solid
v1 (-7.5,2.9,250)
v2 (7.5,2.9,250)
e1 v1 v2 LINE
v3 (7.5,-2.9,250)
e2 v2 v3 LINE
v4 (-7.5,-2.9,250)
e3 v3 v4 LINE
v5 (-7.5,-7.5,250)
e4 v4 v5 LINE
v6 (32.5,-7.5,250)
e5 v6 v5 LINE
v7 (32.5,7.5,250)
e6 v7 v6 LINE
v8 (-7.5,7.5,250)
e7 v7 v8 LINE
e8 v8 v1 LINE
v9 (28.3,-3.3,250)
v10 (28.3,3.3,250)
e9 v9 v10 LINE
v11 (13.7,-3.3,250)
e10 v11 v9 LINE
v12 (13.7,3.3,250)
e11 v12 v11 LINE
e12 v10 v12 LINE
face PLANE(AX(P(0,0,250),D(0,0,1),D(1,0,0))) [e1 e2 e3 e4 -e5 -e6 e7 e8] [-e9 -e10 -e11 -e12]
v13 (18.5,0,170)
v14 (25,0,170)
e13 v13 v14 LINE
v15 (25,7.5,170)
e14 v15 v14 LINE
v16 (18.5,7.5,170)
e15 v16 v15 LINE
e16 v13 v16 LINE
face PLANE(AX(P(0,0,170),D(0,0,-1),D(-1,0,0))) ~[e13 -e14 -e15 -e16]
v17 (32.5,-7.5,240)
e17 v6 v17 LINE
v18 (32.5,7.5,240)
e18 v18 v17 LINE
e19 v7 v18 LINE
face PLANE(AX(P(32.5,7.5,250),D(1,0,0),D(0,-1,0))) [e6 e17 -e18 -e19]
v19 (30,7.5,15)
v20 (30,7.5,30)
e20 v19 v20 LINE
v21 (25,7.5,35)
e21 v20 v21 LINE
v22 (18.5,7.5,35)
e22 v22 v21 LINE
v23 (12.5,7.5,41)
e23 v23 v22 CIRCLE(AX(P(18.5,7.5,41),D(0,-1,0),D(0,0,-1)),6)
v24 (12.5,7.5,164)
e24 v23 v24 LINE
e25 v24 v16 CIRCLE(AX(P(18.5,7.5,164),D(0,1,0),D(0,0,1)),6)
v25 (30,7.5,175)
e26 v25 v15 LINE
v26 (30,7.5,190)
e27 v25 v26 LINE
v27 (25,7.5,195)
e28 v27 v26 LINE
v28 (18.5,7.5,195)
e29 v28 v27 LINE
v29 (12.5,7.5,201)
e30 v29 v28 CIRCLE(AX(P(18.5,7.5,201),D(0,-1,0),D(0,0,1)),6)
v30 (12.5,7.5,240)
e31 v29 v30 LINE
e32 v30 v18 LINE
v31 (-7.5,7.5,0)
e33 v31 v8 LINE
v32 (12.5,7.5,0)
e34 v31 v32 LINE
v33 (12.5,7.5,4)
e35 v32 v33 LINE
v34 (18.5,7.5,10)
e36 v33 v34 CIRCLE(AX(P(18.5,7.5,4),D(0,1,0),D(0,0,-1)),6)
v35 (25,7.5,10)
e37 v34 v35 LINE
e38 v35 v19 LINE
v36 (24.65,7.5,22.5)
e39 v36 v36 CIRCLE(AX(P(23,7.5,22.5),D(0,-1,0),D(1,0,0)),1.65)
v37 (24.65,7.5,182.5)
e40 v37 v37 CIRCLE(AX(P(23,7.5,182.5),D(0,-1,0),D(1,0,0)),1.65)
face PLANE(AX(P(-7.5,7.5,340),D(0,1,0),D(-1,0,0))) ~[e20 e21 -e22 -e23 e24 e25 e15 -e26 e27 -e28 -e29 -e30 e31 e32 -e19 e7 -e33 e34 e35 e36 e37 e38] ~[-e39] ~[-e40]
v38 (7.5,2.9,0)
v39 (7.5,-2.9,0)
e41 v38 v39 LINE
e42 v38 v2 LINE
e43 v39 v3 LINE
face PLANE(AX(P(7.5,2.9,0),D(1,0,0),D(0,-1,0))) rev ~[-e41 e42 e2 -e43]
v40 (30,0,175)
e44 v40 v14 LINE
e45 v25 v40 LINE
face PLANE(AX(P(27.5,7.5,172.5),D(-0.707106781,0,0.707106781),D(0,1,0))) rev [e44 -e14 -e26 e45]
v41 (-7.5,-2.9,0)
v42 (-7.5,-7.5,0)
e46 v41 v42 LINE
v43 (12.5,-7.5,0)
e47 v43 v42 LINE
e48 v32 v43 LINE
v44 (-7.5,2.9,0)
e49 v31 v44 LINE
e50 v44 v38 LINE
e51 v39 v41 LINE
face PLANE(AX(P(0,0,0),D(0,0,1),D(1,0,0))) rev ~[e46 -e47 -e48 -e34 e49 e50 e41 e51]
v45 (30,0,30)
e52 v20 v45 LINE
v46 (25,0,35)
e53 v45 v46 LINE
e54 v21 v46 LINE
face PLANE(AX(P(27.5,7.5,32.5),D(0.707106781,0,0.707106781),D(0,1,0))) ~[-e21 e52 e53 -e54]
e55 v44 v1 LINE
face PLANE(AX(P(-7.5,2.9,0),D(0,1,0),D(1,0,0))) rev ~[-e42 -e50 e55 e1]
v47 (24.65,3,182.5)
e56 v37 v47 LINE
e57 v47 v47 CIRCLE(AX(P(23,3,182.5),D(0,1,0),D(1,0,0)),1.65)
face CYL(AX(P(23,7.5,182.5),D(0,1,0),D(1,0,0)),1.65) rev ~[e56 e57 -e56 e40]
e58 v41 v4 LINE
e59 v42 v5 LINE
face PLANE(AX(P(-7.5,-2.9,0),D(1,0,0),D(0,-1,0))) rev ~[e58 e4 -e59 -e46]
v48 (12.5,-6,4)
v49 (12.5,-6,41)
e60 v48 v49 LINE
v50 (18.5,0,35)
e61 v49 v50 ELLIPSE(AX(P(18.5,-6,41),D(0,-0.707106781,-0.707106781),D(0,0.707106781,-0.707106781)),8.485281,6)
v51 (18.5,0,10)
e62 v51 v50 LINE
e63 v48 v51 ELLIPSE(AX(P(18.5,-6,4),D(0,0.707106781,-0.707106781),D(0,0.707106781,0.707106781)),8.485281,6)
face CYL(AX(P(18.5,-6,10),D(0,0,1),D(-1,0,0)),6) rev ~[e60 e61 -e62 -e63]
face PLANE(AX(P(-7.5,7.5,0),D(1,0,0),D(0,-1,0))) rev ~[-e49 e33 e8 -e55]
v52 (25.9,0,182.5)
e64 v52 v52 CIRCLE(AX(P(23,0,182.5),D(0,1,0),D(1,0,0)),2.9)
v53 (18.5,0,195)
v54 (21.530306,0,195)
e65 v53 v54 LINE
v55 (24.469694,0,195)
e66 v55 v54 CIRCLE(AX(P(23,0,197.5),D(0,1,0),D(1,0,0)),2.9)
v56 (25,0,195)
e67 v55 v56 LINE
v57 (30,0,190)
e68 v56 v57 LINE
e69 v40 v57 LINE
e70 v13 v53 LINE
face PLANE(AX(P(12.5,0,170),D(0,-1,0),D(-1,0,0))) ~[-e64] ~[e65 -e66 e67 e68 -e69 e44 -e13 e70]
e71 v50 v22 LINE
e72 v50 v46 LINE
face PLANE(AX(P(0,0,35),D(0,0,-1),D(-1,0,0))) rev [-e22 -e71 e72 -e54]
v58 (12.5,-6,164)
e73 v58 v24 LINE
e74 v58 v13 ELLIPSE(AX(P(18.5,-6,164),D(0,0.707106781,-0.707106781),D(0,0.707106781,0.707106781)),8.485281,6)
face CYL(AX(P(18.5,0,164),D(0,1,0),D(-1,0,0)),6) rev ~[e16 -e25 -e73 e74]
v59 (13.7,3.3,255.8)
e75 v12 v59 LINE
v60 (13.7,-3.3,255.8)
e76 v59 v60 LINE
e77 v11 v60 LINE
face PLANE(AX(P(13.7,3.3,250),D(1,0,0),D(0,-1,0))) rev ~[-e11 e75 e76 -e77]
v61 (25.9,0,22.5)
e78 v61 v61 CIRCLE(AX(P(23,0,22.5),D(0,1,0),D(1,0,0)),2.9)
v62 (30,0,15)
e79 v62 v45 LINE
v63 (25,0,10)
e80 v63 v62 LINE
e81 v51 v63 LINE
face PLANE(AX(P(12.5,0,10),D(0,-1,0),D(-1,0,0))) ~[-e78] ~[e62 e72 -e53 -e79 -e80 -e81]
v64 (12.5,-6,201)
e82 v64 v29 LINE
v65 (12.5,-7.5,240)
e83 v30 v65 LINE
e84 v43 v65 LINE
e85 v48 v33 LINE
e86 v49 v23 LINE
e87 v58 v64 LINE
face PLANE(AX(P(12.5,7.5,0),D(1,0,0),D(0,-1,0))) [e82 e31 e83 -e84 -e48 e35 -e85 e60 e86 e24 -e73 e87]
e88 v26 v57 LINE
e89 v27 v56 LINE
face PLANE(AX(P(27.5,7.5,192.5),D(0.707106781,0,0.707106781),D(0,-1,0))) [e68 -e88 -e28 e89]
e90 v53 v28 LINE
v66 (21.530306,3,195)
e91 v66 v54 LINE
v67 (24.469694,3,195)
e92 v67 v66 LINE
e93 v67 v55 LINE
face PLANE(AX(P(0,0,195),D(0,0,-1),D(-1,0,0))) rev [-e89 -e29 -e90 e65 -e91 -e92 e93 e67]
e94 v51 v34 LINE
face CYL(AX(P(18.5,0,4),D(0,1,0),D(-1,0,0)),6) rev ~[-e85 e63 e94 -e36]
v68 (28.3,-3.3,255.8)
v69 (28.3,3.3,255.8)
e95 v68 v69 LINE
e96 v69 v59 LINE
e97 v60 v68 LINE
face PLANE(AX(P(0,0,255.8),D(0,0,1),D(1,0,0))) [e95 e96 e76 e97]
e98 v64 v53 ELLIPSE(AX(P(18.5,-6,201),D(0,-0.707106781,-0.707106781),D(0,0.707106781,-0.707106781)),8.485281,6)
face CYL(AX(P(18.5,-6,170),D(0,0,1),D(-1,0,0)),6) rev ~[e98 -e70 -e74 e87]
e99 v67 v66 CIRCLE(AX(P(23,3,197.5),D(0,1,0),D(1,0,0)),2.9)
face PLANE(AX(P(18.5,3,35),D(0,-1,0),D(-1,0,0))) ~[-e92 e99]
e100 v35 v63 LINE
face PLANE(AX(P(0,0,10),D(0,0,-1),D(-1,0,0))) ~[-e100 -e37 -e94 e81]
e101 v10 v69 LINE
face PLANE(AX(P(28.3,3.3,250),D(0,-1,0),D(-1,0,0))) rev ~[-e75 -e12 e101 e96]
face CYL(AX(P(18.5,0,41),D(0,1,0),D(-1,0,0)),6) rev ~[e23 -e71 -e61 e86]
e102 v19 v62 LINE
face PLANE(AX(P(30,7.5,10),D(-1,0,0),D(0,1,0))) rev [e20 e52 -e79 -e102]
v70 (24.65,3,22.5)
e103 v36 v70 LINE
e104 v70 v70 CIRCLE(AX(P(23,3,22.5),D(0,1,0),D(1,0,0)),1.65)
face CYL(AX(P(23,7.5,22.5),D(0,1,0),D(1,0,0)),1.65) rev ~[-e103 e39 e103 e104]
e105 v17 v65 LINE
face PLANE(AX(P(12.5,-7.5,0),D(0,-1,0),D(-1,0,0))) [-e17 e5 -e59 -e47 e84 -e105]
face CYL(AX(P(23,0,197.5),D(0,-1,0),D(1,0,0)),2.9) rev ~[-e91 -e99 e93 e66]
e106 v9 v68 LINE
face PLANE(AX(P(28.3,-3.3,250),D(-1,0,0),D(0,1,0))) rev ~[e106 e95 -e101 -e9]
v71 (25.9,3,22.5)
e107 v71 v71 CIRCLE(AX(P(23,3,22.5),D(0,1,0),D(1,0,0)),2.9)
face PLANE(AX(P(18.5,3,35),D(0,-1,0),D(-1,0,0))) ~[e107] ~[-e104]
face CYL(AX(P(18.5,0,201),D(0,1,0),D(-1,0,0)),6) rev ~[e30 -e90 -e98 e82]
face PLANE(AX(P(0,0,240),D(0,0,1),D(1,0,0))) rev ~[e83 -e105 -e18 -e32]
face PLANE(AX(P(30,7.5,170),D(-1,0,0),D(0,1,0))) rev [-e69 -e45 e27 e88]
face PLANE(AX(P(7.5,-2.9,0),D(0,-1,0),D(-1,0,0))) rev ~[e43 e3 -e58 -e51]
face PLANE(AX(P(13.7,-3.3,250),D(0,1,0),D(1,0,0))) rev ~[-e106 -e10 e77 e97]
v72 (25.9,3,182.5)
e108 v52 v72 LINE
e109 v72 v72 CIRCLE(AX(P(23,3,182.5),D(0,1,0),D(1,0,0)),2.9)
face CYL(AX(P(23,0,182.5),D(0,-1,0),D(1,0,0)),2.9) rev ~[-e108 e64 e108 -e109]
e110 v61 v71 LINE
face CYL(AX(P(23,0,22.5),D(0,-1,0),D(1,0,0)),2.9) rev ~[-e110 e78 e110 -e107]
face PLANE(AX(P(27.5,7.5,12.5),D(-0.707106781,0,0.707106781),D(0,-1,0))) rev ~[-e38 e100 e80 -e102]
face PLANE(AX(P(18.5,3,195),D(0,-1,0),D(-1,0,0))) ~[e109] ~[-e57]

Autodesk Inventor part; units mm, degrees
ref_plane "YZ Plane" through (0, 0, 0) normal (1, 0, 0) x (0, 1, 0)
ref_plane "XZ Plane" through (0, 0, 0) normal (0, 1, 0) x (-1, 0, 0)
sketch "Sketch1" plane through (0, 0, 0) normal (0, 0, 1) x (1, 0, 0)
  line L0 (-7.5, 2.9) -> (7.5, 2.9)
  line L1 (7.5, 2.9) -> (7.5, -2.9)
  line L2 (7.5, -2.9) -> (-7.5, -2.9)
  line L3 (-7.5, -2.9) -> (-7.5, 2.9)
  line L4 (-7.5, 2.9) -> (7.5, -2.9) construction
  line L5 (7.5, 2.9) -> (-7.5, -2.9) construction
  line L6 (-12.5, 7.5) -> (12.5, 7.5)
  line L7 (12.5, 7.5) -> (12.5, -7.5)
  line L8 (12.5, -7.5) -> (-12.5, -7.5)
  line L9 (-12.5, -7.5) -> (-12.5, 7.5)
  line L10 (-12.5, 7.5) -> (12.5, -7.5) construction
  line L11 (12.5, 7.5) -> (-12.5, -7.5) construction
  line L12 (-7.5, 7.5) -> (-7.5, -7.5)
  point P0 (0, 0)
  point P1 (-7.5, 2.9)
  dimension "d0" = 15
  dimension "d1" = 5.8
  dimension "d2" = 25
  dimension "d3" = 15
extrude "Extrusion1" add sketch "Sketch1" along normal blind 500 contours L12 L6 L7 L8 L2 L1 L0
ref_plane "Work Plane1" through (0, 0, 330) normal (0, 0, 1) x (1, 0, 0)
sketch "Sketch2" plane through (0, 0, 330) normal (0, 0, 1) x (1, 0, 0)
  line L0 (-5, 7.5) -> (30, 7.5)
  line L1 (30, 7.5) -> (30, -7.5)
  line L2 (30, -7.5) -> (-5, -7.5)
  line L3 (-5, -7.5) -> (-5, 7.5)
  line L4 (12.5, -7.5) -> (12.5, 7.5)
  line L5 (-5, 7.5) -> (30, -7.5) construction
  line L6 (30, 7.5) -> (-5, -7.5) construction
  line L7 (12.5, 0) -> (30, 0)
  line L8 (30, 0) -> (30, 7.5)
  line L9 (30, 7.5) -> (12.5, 7.5)
  line L10 (12.5, 7.5) -> (12.5, 0)
  line L11 (7.5, -2.9) -> (-7.5, -2.9) projected
  line L12 (-7.5, -2.9) -> (-7.5, -7.5) projected
  line L13 (-7.5, -7.5) -> (12.5, -7.5) projected
  line L14 (12.5, -7.5) -> (12.5, 7.5) projected
  line L15 (12.5, 7.5) -> (-7.5, 7.5) projected
  line L16 (-7.5, 7.5) -> (-7.5, 2.9) projected
  line L17 (-7.5, 2.9) -> (7.5, 2.9) projected
  line L18 (7.5, 2.9) -> (7.5, -2.9) projected
  point P0 (0, 0)
  point P1 (12.5, -6.5)
  point P2 (12.5, 6.5)
  point P3 (12.5, 7.5)
  point P4 (12.5, 6.5)
  point P5 (30, 0)
  dimension "d8" = 35
extrude "Extrusion2" add sketch "Sketch2" against normal blind 25 contours L0 L1 L7 L4
fillet "Fillet2" radius 6 3 edges at (12.5, 3.75, 305) (12.5, 0, 317.5) (12.5, 3.75, 330)
sketch "Sketch4" plane through (-7.5, 7.5, 0) normal (0, 1, 0) x (1, 0, 0)
  line L0 (20, 0) -> (0, 0) projected
  line L1 (0, 0) -> (0, -500) projected
  line L2 (20, -500) -> (0, -500) projected
  line L3 (20, -336) -> (20, -500) projected
  arc A0 (26, -330) -> (20, -336) centre (26, -336) ccw projected
  line L4 (37.5, -330) -> (26, -330) projected
  line L5 (37.5, -330) -> (37.5, -305) projected
  line L6 (26, -305) -> (37.5, -305) projected
  arc A1 (20, -299) -> (26, -305) centre (26, -299) ccw projected
  line L7 (20, 0) -> (20, -299) projected
  circle A2 centre (30.5, -317.5) radius 1.65
  line L8 (20, 0) -> (20, -500) projected
  line L9 (20, -250) -> (51.65, -250)
  circle A3 centre (30.5, -142.5) radius 1.65
  point P0 (7.5, 0)
  point P1 (20, -181)
  point P2 (20, -144)
  point P3 (37.5, -317.5)
  point P4 (37.5, -142.5)
  dimension "d16" = 3.3
  dimension "d17" = 7
extrude "Extrusion4" cut sketch "Sketch4" against normal through all contours A2 | A3
chamfer "Chamfer1" distance 5 angle 45 2 edges at (30, 3.75, 330) (30, 3.75, 305)
sketch "Sketch5" plane through (18.5, 0, 305) normal (0, -1, 0) x (1, 0, 0)
  line L0 (11.5, -170) -> (6.5, -175) projected
  line L1 (11.5, -170) -> (11.5, -155) projected
  line L2 (6.5, -150) -> (11.5, -155) projected
  line L3 (0, -150) -> (6.5, -150) projected
  line L4 (0, -175) -> (0, -150) projected
  line L5 (6.5, -175) -> (0, -175) projected
  circle A0 centre (4.5, -162.5) radius 1.65 projected
  circle A1 centre (4.5, 12.5) radius 1.65 projected
  line L6 (11.5, 5) -> (6.5, 0) projected
  line L7 (11.5, 20) -> (11.5, 5) projected
  line L8 (6.5, 25) -> (11.5, 20) projected
  line L9 (0, 25) -> (6.5, 25) projected
  line L10 (0, 0) -> (0, 25) projected
  line L11 (6.5, 0) -> (0, 0) projected
  circle A2 centre (4.5, 12.5) radius 2.9
  circle A3 centre (4.5, -162.5) radius 2.9
  point P0 (-18.5, -305)
  dimension "d23" = 5.8
extrude "Extrusion5" cut sketch "Sketch5" against normal blind 3 contours A2 | A3
ref_plane "Work Plane3" through (0, 0, 250) normal (0, 0, -1) x (-1, 0, 0)
pattern_linear "Rectangular Pattern1" count 2 spacing 160 along (0, 0, 1) of "Extrusion2", "Fillet2", "Extrusion4", "Chamfer1", "Extrusion5"
mirror "Mirror1" about plane through (0, 0, 250) normal (0, 0, -1) of "Extrusion2", "Fillet2", "Extrusion4", "Chamfer1", "Extrusion5", "Rectangular Pattern1"
ref_plane "Work Plane4" through (0, 0, 250) normal (0, 0, 1) x (1, 0, 0)
sketch "Sketch6" plane through (0, 0, 250) normal (0, 0, 1) x (1, 0, 0)
  line L0 (12.5, 7.5) -> (12.5, -6) projected
  line L1 (12.5, -6) -> (12.5, 7.5) projected
  line L2 (12.5, 7.5) -> (12.5, -6) projected
  line L3 (12.5, -6) -> (12.5, 7.5) projected
  line L4 (12.5, 7.5) -> (12.5, -6) projected
  line L5 (12.5, -6) -> (12.5, 7.5) projected
  line L6 (12.5, 7.5) -> (12.5, -6) projected
  line L7 (12.5, -7.5) -> (12.5, 7.5) projected
  line L8 (12.5, -7.5) -> (12.5, 7.5) projected
  line L9 (12.5, -6) -> (12.5, 7.5) projected
  line L10 (12.5, 7.5) -> (32.5, 7.5)
  line L11 (32.5, 7.5) -> (32.5, -7.5)
  line L12 (32.5, -7.5) -> (12.5, -7.5)
  line L13 (12.5, -7.5) -> (12.5, 7.5)
  point P0 (0, 0)
  dimension "d29" = 20
extrude "Extrusion6" add sketch "Sketch6" along normal mid plane 20
sketch "Sketch7" plane through (0, 0, 250) normal (0, 0, 1) x (1, 0, 0)
  line L0 (-44.2383, 45.2094) -> (125.162, 45.2094)
  line L1 (125.162, 45.2094) -> (125.162, -53.1939)
  line L2 (125.162, -53.1939) -> (-44.2383, -53.1939)
  line L3 (-44.2383, -53.1939) -> (-44.2383, 45.2094)
  point P0 (0, 0)
extrude "Extrusion7" cut sketch "Sketch7" along normal through all
sketch "Sketch8" plane through (0, 0, 250) normal (0, 0, 1) x (1, 0, 0)
  line L0 (7.5, -2.9) -> (7.5, 2.9) projected
  line L1 (-7.5, -2.9) -> (7.5, -2.9) projected
  line L2 (-7.5, -7.5) -> (-7.5, -2.9) projected
  line L3 (32.5, -7.5) -> (-7.5, -7.5) projected
  line L4 (32.5, 7.5) -> (32.5, -7.5) projected
  line L5 (-7.5, 7.5) -> (32.5, 7.5) projected
  line L6 (-7.5, 2.9) -> (-7.5, 7.5) projected
  line L7 (7.5, 2.9) -> (-7.5, 2.9) projected
  line L8 (13.5, 3.5) -> (28.5, 3.5)
  line L9 (28.5, 3.5) -> (28.5, -3.5)
  line L10 (28.5, -3.5) -> (13.5, -3.5)
  line L11 (13.5, -3.5) -> (13.5, 3.5)
  line L12 (28.3, 3.3) -> (13.7, 3.3)
  line L13 (13.7, 3.3) -> (13.7, -3.3)
  line L14 (13.7, -3.3) -> (28.3, -3.3)
  line L15 (28.3, -3.3) -> (28.3, 3.3)
  point P0 (0, 0)
  point P1 (28.5, 0)
  point P2 (32.5, 0)
  dimension "d34" = 15
  dimension "d35" = 4
  dimension "d36" = 7
  dimension "d37" = 0.2
extrude "Extrusion8" add sketch "Sketch8" along normal blind 5.8 contours L15 L14 L13 L12
properties part number "GUIA DE TAPA PRINCIPAL"
